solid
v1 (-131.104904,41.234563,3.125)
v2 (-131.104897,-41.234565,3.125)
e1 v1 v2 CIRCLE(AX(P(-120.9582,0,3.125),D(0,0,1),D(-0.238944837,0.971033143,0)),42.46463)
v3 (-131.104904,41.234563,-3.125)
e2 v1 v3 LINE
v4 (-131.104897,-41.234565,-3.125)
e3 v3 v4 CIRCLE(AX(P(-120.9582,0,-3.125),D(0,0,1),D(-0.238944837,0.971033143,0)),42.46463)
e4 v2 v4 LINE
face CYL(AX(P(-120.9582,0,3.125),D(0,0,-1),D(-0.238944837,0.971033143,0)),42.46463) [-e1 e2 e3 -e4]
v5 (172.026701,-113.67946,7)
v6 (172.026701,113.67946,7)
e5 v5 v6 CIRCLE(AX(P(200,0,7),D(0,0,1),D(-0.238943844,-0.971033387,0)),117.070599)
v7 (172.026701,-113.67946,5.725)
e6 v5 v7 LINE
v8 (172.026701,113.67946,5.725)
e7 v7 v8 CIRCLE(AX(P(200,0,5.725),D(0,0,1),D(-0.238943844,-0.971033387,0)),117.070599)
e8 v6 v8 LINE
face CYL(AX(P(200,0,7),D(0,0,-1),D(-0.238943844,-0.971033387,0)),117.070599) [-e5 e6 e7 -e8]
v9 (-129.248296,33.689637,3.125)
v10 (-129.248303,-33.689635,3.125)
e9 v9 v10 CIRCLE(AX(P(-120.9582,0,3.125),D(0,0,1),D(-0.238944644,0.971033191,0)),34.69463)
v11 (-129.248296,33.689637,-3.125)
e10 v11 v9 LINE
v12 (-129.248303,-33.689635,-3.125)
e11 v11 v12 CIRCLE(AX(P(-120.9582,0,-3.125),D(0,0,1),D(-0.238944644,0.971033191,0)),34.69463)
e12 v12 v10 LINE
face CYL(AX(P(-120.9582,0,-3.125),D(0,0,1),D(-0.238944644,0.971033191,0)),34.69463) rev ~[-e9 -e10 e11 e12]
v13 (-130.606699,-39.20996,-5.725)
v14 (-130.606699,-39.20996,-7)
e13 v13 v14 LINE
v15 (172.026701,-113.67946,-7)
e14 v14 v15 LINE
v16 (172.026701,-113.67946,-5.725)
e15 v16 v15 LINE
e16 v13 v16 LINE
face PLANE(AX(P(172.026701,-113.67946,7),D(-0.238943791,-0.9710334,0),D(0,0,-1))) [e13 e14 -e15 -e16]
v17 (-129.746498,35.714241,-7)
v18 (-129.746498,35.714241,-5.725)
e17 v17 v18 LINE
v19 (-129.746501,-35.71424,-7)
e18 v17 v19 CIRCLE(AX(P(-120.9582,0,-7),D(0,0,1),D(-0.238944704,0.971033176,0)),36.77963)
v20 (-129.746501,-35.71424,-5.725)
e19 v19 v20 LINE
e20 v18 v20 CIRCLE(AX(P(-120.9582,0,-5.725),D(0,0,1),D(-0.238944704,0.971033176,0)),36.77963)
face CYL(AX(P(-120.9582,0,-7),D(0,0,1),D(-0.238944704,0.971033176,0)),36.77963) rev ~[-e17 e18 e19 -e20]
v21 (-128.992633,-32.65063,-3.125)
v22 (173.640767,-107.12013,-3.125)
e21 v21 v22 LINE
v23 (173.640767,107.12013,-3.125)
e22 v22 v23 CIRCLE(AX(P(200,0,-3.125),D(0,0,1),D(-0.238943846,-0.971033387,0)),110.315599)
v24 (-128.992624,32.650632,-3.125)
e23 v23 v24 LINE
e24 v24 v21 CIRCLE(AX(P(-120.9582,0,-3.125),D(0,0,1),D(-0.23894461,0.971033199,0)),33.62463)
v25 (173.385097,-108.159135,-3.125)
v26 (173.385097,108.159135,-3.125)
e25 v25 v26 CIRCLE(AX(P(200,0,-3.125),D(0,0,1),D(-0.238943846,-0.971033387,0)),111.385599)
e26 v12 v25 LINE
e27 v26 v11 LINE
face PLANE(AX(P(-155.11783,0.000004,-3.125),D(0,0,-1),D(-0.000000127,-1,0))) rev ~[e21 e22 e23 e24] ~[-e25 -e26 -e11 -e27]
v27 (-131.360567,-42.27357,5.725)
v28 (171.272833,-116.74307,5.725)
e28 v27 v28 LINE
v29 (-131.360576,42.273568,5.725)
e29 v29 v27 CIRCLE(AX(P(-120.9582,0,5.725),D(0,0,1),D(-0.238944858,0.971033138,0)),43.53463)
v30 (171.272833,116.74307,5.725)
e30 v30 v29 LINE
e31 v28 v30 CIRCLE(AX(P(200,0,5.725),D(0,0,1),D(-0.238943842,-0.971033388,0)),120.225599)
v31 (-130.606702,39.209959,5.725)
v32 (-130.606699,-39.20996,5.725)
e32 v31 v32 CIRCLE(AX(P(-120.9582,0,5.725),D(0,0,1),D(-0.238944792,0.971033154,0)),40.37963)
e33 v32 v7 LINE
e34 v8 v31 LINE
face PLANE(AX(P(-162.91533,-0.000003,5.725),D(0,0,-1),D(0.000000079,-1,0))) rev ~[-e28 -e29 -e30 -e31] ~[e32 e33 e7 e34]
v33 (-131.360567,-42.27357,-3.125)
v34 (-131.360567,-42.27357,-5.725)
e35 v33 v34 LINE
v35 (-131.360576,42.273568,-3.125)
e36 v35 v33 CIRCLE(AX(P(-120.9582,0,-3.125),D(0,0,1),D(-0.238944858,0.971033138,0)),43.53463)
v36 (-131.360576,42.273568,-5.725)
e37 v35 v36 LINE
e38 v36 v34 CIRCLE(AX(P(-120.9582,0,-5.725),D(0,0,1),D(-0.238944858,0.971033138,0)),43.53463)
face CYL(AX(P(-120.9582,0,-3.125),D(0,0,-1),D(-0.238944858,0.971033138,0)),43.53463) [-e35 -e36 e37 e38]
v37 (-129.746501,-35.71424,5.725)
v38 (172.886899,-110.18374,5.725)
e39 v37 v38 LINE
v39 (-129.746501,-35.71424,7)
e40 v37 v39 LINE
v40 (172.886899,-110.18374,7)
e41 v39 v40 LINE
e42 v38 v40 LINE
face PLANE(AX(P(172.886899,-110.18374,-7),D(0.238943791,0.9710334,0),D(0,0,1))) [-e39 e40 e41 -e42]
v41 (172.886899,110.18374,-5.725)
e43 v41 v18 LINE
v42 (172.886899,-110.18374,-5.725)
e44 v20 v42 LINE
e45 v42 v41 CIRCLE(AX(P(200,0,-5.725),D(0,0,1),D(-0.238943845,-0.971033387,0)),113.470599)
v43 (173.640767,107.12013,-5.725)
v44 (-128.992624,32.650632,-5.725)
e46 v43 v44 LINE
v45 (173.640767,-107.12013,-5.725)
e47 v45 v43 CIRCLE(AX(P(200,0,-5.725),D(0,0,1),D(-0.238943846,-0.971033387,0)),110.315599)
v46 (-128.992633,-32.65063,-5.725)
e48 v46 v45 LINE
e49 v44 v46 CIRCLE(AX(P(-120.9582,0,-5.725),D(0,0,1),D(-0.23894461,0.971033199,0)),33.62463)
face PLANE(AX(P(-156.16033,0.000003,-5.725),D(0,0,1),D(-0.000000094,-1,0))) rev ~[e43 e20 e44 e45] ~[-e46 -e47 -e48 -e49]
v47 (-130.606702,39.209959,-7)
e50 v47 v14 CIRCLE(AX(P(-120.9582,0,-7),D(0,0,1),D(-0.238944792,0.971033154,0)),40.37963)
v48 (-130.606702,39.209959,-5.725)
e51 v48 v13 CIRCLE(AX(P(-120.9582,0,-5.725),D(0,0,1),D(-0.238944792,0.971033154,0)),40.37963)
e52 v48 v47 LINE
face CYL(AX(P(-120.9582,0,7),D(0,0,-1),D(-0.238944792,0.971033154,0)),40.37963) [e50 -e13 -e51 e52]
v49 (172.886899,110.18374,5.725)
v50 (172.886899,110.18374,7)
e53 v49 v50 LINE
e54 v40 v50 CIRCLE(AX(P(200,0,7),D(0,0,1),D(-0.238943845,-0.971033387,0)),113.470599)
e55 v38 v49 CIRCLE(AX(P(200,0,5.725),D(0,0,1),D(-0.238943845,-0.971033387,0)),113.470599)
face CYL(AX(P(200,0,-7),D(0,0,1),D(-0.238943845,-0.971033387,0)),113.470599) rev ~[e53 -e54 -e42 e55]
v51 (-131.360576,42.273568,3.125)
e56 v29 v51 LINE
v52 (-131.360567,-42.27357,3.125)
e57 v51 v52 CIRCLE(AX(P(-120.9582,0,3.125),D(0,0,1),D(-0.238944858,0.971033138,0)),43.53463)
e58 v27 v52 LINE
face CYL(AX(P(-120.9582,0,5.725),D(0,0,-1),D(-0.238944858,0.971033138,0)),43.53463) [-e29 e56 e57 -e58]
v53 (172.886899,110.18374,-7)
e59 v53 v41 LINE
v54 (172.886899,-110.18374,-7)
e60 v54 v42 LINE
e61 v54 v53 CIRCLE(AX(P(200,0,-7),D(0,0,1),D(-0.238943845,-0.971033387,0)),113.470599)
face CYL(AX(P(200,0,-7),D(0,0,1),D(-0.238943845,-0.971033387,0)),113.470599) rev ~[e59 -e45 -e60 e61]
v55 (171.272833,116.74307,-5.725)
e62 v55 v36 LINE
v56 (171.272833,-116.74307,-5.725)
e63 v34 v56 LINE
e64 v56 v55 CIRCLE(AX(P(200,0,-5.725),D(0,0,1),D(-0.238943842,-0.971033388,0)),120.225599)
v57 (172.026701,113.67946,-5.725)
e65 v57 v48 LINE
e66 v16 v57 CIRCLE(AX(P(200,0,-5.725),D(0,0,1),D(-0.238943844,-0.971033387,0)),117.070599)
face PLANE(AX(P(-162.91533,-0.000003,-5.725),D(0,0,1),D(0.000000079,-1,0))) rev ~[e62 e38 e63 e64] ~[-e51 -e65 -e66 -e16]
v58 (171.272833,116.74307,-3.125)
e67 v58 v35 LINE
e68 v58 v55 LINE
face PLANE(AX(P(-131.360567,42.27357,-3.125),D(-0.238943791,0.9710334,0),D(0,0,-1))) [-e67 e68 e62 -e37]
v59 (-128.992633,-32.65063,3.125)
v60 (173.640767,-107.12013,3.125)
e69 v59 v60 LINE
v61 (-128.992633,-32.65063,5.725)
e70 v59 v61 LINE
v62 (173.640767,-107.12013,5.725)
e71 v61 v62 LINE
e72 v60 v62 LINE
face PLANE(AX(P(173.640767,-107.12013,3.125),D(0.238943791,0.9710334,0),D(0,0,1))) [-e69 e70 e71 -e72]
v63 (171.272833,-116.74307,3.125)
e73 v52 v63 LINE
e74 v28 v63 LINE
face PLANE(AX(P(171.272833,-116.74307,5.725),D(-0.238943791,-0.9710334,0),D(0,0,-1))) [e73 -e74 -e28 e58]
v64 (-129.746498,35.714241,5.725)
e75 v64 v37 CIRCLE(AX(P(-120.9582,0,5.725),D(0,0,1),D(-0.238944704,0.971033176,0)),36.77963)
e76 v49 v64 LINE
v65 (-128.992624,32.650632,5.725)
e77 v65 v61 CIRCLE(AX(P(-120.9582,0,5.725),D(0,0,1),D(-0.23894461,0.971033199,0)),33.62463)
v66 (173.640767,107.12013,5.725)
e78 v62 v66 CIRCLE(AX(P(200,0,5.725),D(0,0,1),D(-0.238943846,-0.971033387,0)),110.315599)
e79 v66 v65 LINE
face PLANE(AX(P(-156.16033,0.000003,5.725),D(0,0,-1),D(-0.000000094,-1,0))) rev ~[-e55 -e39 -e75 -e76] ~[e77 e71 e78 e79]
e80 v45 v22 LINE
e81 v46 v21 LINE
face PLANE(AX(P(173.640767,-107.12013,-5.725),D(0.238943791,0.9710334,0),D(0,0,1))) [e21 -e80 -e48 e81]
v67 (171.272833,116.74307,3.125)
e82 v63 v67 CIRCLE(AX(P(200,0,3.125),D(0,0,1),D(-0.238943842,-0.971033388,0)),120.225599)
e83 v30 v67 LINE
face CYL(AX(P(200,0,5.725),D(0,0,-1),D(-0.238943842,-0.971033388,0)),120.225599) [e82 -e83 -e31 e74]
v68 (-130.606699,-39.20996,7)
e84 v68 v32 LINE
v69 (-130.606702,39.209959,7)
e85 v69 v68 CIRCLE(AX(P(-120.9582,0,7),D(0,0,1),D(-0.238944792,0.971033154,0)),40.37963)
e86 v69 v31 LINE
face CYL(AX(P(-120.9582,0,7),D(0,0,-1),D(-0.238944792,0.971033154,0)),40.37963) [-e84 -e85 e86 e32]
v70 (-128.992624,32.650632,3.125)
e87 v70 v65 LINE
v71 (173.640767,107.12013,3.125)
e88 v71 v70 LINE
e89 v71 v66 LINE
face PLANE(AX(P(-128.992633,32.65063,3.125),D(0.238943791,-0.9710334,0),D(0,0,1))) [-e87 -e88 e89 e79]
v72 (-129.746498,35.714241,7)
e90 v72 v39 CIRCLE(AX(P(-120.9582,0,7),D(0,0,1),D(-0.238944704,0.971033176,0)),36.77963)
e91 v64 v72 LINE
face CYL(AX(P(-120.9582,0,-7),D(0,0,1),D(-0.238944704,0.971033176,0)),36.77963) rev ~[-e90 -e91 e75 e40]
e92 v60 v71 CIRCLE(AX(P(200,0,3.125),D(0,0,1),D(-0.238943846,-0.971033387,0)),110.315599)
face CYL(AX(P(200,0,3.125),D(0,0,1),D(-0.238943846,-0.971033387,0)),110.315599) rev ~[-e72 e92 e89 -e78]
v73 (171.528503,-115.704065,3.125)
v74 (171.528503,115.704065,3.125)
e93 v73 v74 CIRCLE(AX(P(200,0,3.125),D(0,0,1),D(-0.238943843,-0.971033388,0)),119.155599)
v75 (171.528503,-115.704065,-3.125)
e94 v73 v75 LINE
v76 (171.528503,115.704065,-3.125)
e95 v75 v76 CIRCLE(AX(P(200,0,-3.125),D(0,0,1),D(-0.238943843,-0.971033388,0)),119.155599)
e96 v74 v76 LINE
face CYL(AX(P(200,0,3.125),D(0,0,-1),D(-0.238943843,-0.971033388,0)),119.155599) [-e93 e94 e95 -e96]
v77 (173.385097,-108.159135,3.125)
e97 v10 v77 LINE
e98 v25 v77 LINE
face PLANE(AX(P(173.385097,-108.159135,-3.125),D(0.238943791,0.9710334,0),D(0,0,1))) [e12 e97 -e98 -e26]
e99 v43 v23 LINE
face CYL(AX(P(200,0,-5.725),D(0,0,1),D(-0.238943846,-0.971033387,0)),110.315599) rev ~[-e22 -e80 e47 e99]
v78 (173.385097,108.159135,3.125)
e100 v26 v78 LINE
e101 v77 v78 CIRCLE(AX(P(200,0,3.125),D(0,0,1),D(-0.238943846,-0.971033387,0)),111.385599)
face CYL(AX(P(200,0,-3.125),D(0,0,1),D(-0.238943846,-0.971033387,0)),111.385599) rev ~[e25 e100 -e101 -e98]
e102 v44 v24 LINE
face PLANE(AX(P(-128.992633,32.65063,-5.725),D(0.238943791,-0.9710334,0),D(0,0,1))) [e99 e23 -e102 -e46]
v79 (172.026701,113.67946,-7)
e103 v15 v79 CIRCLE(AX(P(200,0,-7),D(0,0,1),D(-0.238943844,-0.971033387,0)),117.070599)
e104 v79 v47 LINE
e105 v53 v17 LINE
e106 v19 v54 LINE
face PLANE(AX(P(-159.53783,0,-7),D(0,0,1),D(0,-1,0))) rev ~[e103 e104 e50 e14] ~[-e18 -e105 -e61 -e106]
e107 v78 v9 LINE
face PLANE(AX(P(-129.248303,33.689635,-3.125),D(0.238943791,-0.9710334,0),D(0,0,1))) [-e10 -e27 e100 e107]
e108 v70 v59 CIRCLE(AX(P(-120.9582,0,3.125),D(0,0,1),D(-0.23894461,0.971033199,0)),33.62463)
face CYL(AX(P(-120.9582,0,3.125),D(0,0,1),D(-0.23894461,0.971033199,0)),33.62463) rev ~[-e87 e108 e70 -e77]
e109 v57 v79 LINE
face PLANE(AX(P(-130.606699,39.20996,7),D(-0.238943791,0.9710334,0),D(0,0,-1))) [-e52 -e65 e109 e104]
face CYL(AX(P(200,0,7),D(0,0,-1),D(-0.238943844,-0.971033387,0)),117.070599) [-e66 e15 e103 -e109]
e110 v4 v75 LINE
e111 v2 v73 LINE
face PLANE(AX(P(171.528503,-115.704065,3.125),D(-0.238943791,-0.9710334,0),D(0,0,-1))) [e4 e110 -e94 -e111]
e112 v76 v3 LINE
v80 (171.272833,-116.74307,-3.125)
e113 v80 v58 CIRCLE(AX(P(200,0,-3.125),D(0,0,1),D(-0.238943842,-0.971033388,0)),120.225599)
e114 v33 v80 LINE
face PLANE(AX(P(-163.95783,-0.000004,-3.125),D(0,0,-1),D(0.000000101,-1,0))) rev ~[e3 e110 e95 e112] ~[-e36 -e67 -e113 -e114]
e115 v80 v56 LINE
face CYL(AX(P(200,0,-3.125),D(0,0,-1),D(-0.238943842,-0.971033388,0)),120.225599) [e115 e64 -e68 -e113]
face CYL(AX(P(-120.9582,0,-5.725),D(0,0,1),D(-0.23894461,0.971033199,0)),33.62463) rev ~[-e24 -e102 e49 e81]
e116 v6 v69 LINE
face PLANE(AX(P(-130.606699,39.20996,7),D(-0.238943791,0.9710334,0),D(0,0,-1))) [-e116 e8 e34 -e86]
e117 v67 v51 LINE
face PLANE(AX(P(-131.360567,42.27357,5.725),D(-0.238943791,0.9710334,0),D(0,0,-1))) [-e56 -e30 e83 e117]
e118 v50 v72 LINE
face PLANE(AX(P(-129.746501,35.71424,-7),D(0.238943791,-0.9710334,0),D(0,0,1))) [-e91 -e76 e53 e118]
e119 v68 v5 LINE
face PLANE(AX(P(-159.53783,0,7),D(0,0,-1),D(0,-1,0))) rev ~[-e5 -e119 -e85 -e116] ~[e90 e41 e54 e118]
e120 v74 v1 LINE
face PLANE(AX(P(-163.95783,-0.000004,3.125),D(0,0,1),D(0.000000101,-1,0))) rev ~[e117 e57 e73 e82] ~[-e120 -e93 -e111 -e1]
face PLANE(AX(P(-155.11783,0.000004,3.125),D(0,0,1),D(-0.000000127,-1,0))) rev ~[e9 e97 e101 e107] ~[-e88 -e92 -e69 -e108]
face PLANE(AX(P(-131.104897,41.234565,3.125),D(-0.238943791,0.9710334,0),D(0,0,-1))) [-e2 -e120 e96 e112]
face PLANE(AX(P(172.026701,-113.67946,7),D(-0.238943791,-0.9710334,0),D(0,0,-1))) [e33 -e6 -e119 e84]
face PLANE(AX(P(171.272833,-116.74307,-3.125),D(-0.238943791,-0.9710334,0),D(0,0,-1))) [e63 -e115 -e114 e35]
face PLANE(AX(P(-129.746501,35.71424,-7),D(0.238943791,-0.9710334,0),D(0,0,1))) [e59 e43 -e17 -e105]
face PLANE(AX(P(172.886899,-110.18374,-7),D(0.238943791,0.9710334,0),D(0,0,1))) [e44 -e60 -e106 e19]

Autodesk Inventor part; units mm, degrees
ref_plane "Arbeitsebene2" through (-120.9582, 0, 0) normal (-1, 0, 0) x (0, 0, 1)
ref_plane "Arbeitsebene3" through (200, 0, 0) normal (-0.9757842, -0.2187353, 0) x (0, 0, 1)
sketch "Pfad" plane through (0, 0, 0) normal (0, 0, 1) x (1, 0, 0)
  arc A0 (-130.1766, 37.4621) -> (-130.1766, -37.4621) centre (-120.9582, 0) ccw
  arc A1 (172.4568, -111.9316) -> (172.4568, 111.9316) centre (200, 0) ccw
  line L0 (172.4568, -111.9316) -> (-130.1766, -37.4621)
  line L1 (-130.1766, 37.4621) -> (172.4568, 111.9316)
  dimension "d31" = 9.91
ref_plane "Profilebene" through (-130.1766, -37.4621, 0) normal (0.9710334, -0.2389438, 0) x (0, 0, 1)
sketch "Profilskizze" plane through (-130.1766, -37.4621, 0) normal (0.9710334, -0.2389438, 0) x (0, 0, 1)
  line L0 (-7, -1.8) -> (7, -1.8)
  line L1 (7, -1.8) -> (7, 1.8)
  line L2 (7, 1.8) -> (-7, 1.8)
  line L3 (-7, 1.8) -> (-7, -1.8)
  line L4 (-3.125, -3.885) -> (3.125, -3.885)
  line L5 (3.125, -3.885) -> (3.125, 3.885)
  line L6 (3.125, 3.885) -> (-3.125, 3.885)
  line L7 (-3.125, 3.885) -> (-3.125, -3.885)
  line L8 (-3.125, 0) -> (3.125, 0) construction
  line L9 (-5.725, -4.955) -> (-3.125, -4.955)
  line L10 (-3.125, -4.955) -> (-3.125, 4.955)
  line L11 (-3.125, 4.955) -> (-5.725, 4.955)
  line L12 (-5.725, 4.955) -> (-5.725, -4.955)
  line L13 (3.125, -4.955) -> (5.725, -4.955)
  line L14 (5.725, -4.955) -> (5.725, 4.955)
  line L15 (5.725, 4.955) -> (3.125, 4.955)
  line L16 (3.125, 4.955) -> (3.125, -4.955)
  line L17 (-7, 0) -> (7, 0) construction
  point P0 (0, 0)
  point P1 (0, 0)
  dimension "d21" = 3.6
  dimension "d22" = 7.77
  dimension "d23" = 6.25
  dimension "d24" = 2.6
  dimension "d31" = 9.91
  dimension "d32" = 14
sweep "Volumenkörper" add profiles "Profilskizze" path "Pfad"
pattern_of_one "Strand Pattern"
equation "\"d21\" = da_d2"
equation "\"d22\" = da_d1"
equation "\"d23\" = da_b1"
equation "\"d24\" = da_t1 + da_t2"
equation "\"d30\" = da_pt"
equation "\"da_p\" = 12.7"
equation "\"da_b1\" = 6.25"
equation "\"da_h2\" = 9.91"
equation "\"da_h3\" = 8.51"
equation "\"da_d1\" = 7.77"
equation "\"da_d2\" = 3.6"
equation "\"da_pt\" = 13.92"
equation "\"da_b\" = 14"
equation "\"da_t1\" = 1.3"
equation "\"da_t2\" = 1.3"
properties part number "Rollenkette"
